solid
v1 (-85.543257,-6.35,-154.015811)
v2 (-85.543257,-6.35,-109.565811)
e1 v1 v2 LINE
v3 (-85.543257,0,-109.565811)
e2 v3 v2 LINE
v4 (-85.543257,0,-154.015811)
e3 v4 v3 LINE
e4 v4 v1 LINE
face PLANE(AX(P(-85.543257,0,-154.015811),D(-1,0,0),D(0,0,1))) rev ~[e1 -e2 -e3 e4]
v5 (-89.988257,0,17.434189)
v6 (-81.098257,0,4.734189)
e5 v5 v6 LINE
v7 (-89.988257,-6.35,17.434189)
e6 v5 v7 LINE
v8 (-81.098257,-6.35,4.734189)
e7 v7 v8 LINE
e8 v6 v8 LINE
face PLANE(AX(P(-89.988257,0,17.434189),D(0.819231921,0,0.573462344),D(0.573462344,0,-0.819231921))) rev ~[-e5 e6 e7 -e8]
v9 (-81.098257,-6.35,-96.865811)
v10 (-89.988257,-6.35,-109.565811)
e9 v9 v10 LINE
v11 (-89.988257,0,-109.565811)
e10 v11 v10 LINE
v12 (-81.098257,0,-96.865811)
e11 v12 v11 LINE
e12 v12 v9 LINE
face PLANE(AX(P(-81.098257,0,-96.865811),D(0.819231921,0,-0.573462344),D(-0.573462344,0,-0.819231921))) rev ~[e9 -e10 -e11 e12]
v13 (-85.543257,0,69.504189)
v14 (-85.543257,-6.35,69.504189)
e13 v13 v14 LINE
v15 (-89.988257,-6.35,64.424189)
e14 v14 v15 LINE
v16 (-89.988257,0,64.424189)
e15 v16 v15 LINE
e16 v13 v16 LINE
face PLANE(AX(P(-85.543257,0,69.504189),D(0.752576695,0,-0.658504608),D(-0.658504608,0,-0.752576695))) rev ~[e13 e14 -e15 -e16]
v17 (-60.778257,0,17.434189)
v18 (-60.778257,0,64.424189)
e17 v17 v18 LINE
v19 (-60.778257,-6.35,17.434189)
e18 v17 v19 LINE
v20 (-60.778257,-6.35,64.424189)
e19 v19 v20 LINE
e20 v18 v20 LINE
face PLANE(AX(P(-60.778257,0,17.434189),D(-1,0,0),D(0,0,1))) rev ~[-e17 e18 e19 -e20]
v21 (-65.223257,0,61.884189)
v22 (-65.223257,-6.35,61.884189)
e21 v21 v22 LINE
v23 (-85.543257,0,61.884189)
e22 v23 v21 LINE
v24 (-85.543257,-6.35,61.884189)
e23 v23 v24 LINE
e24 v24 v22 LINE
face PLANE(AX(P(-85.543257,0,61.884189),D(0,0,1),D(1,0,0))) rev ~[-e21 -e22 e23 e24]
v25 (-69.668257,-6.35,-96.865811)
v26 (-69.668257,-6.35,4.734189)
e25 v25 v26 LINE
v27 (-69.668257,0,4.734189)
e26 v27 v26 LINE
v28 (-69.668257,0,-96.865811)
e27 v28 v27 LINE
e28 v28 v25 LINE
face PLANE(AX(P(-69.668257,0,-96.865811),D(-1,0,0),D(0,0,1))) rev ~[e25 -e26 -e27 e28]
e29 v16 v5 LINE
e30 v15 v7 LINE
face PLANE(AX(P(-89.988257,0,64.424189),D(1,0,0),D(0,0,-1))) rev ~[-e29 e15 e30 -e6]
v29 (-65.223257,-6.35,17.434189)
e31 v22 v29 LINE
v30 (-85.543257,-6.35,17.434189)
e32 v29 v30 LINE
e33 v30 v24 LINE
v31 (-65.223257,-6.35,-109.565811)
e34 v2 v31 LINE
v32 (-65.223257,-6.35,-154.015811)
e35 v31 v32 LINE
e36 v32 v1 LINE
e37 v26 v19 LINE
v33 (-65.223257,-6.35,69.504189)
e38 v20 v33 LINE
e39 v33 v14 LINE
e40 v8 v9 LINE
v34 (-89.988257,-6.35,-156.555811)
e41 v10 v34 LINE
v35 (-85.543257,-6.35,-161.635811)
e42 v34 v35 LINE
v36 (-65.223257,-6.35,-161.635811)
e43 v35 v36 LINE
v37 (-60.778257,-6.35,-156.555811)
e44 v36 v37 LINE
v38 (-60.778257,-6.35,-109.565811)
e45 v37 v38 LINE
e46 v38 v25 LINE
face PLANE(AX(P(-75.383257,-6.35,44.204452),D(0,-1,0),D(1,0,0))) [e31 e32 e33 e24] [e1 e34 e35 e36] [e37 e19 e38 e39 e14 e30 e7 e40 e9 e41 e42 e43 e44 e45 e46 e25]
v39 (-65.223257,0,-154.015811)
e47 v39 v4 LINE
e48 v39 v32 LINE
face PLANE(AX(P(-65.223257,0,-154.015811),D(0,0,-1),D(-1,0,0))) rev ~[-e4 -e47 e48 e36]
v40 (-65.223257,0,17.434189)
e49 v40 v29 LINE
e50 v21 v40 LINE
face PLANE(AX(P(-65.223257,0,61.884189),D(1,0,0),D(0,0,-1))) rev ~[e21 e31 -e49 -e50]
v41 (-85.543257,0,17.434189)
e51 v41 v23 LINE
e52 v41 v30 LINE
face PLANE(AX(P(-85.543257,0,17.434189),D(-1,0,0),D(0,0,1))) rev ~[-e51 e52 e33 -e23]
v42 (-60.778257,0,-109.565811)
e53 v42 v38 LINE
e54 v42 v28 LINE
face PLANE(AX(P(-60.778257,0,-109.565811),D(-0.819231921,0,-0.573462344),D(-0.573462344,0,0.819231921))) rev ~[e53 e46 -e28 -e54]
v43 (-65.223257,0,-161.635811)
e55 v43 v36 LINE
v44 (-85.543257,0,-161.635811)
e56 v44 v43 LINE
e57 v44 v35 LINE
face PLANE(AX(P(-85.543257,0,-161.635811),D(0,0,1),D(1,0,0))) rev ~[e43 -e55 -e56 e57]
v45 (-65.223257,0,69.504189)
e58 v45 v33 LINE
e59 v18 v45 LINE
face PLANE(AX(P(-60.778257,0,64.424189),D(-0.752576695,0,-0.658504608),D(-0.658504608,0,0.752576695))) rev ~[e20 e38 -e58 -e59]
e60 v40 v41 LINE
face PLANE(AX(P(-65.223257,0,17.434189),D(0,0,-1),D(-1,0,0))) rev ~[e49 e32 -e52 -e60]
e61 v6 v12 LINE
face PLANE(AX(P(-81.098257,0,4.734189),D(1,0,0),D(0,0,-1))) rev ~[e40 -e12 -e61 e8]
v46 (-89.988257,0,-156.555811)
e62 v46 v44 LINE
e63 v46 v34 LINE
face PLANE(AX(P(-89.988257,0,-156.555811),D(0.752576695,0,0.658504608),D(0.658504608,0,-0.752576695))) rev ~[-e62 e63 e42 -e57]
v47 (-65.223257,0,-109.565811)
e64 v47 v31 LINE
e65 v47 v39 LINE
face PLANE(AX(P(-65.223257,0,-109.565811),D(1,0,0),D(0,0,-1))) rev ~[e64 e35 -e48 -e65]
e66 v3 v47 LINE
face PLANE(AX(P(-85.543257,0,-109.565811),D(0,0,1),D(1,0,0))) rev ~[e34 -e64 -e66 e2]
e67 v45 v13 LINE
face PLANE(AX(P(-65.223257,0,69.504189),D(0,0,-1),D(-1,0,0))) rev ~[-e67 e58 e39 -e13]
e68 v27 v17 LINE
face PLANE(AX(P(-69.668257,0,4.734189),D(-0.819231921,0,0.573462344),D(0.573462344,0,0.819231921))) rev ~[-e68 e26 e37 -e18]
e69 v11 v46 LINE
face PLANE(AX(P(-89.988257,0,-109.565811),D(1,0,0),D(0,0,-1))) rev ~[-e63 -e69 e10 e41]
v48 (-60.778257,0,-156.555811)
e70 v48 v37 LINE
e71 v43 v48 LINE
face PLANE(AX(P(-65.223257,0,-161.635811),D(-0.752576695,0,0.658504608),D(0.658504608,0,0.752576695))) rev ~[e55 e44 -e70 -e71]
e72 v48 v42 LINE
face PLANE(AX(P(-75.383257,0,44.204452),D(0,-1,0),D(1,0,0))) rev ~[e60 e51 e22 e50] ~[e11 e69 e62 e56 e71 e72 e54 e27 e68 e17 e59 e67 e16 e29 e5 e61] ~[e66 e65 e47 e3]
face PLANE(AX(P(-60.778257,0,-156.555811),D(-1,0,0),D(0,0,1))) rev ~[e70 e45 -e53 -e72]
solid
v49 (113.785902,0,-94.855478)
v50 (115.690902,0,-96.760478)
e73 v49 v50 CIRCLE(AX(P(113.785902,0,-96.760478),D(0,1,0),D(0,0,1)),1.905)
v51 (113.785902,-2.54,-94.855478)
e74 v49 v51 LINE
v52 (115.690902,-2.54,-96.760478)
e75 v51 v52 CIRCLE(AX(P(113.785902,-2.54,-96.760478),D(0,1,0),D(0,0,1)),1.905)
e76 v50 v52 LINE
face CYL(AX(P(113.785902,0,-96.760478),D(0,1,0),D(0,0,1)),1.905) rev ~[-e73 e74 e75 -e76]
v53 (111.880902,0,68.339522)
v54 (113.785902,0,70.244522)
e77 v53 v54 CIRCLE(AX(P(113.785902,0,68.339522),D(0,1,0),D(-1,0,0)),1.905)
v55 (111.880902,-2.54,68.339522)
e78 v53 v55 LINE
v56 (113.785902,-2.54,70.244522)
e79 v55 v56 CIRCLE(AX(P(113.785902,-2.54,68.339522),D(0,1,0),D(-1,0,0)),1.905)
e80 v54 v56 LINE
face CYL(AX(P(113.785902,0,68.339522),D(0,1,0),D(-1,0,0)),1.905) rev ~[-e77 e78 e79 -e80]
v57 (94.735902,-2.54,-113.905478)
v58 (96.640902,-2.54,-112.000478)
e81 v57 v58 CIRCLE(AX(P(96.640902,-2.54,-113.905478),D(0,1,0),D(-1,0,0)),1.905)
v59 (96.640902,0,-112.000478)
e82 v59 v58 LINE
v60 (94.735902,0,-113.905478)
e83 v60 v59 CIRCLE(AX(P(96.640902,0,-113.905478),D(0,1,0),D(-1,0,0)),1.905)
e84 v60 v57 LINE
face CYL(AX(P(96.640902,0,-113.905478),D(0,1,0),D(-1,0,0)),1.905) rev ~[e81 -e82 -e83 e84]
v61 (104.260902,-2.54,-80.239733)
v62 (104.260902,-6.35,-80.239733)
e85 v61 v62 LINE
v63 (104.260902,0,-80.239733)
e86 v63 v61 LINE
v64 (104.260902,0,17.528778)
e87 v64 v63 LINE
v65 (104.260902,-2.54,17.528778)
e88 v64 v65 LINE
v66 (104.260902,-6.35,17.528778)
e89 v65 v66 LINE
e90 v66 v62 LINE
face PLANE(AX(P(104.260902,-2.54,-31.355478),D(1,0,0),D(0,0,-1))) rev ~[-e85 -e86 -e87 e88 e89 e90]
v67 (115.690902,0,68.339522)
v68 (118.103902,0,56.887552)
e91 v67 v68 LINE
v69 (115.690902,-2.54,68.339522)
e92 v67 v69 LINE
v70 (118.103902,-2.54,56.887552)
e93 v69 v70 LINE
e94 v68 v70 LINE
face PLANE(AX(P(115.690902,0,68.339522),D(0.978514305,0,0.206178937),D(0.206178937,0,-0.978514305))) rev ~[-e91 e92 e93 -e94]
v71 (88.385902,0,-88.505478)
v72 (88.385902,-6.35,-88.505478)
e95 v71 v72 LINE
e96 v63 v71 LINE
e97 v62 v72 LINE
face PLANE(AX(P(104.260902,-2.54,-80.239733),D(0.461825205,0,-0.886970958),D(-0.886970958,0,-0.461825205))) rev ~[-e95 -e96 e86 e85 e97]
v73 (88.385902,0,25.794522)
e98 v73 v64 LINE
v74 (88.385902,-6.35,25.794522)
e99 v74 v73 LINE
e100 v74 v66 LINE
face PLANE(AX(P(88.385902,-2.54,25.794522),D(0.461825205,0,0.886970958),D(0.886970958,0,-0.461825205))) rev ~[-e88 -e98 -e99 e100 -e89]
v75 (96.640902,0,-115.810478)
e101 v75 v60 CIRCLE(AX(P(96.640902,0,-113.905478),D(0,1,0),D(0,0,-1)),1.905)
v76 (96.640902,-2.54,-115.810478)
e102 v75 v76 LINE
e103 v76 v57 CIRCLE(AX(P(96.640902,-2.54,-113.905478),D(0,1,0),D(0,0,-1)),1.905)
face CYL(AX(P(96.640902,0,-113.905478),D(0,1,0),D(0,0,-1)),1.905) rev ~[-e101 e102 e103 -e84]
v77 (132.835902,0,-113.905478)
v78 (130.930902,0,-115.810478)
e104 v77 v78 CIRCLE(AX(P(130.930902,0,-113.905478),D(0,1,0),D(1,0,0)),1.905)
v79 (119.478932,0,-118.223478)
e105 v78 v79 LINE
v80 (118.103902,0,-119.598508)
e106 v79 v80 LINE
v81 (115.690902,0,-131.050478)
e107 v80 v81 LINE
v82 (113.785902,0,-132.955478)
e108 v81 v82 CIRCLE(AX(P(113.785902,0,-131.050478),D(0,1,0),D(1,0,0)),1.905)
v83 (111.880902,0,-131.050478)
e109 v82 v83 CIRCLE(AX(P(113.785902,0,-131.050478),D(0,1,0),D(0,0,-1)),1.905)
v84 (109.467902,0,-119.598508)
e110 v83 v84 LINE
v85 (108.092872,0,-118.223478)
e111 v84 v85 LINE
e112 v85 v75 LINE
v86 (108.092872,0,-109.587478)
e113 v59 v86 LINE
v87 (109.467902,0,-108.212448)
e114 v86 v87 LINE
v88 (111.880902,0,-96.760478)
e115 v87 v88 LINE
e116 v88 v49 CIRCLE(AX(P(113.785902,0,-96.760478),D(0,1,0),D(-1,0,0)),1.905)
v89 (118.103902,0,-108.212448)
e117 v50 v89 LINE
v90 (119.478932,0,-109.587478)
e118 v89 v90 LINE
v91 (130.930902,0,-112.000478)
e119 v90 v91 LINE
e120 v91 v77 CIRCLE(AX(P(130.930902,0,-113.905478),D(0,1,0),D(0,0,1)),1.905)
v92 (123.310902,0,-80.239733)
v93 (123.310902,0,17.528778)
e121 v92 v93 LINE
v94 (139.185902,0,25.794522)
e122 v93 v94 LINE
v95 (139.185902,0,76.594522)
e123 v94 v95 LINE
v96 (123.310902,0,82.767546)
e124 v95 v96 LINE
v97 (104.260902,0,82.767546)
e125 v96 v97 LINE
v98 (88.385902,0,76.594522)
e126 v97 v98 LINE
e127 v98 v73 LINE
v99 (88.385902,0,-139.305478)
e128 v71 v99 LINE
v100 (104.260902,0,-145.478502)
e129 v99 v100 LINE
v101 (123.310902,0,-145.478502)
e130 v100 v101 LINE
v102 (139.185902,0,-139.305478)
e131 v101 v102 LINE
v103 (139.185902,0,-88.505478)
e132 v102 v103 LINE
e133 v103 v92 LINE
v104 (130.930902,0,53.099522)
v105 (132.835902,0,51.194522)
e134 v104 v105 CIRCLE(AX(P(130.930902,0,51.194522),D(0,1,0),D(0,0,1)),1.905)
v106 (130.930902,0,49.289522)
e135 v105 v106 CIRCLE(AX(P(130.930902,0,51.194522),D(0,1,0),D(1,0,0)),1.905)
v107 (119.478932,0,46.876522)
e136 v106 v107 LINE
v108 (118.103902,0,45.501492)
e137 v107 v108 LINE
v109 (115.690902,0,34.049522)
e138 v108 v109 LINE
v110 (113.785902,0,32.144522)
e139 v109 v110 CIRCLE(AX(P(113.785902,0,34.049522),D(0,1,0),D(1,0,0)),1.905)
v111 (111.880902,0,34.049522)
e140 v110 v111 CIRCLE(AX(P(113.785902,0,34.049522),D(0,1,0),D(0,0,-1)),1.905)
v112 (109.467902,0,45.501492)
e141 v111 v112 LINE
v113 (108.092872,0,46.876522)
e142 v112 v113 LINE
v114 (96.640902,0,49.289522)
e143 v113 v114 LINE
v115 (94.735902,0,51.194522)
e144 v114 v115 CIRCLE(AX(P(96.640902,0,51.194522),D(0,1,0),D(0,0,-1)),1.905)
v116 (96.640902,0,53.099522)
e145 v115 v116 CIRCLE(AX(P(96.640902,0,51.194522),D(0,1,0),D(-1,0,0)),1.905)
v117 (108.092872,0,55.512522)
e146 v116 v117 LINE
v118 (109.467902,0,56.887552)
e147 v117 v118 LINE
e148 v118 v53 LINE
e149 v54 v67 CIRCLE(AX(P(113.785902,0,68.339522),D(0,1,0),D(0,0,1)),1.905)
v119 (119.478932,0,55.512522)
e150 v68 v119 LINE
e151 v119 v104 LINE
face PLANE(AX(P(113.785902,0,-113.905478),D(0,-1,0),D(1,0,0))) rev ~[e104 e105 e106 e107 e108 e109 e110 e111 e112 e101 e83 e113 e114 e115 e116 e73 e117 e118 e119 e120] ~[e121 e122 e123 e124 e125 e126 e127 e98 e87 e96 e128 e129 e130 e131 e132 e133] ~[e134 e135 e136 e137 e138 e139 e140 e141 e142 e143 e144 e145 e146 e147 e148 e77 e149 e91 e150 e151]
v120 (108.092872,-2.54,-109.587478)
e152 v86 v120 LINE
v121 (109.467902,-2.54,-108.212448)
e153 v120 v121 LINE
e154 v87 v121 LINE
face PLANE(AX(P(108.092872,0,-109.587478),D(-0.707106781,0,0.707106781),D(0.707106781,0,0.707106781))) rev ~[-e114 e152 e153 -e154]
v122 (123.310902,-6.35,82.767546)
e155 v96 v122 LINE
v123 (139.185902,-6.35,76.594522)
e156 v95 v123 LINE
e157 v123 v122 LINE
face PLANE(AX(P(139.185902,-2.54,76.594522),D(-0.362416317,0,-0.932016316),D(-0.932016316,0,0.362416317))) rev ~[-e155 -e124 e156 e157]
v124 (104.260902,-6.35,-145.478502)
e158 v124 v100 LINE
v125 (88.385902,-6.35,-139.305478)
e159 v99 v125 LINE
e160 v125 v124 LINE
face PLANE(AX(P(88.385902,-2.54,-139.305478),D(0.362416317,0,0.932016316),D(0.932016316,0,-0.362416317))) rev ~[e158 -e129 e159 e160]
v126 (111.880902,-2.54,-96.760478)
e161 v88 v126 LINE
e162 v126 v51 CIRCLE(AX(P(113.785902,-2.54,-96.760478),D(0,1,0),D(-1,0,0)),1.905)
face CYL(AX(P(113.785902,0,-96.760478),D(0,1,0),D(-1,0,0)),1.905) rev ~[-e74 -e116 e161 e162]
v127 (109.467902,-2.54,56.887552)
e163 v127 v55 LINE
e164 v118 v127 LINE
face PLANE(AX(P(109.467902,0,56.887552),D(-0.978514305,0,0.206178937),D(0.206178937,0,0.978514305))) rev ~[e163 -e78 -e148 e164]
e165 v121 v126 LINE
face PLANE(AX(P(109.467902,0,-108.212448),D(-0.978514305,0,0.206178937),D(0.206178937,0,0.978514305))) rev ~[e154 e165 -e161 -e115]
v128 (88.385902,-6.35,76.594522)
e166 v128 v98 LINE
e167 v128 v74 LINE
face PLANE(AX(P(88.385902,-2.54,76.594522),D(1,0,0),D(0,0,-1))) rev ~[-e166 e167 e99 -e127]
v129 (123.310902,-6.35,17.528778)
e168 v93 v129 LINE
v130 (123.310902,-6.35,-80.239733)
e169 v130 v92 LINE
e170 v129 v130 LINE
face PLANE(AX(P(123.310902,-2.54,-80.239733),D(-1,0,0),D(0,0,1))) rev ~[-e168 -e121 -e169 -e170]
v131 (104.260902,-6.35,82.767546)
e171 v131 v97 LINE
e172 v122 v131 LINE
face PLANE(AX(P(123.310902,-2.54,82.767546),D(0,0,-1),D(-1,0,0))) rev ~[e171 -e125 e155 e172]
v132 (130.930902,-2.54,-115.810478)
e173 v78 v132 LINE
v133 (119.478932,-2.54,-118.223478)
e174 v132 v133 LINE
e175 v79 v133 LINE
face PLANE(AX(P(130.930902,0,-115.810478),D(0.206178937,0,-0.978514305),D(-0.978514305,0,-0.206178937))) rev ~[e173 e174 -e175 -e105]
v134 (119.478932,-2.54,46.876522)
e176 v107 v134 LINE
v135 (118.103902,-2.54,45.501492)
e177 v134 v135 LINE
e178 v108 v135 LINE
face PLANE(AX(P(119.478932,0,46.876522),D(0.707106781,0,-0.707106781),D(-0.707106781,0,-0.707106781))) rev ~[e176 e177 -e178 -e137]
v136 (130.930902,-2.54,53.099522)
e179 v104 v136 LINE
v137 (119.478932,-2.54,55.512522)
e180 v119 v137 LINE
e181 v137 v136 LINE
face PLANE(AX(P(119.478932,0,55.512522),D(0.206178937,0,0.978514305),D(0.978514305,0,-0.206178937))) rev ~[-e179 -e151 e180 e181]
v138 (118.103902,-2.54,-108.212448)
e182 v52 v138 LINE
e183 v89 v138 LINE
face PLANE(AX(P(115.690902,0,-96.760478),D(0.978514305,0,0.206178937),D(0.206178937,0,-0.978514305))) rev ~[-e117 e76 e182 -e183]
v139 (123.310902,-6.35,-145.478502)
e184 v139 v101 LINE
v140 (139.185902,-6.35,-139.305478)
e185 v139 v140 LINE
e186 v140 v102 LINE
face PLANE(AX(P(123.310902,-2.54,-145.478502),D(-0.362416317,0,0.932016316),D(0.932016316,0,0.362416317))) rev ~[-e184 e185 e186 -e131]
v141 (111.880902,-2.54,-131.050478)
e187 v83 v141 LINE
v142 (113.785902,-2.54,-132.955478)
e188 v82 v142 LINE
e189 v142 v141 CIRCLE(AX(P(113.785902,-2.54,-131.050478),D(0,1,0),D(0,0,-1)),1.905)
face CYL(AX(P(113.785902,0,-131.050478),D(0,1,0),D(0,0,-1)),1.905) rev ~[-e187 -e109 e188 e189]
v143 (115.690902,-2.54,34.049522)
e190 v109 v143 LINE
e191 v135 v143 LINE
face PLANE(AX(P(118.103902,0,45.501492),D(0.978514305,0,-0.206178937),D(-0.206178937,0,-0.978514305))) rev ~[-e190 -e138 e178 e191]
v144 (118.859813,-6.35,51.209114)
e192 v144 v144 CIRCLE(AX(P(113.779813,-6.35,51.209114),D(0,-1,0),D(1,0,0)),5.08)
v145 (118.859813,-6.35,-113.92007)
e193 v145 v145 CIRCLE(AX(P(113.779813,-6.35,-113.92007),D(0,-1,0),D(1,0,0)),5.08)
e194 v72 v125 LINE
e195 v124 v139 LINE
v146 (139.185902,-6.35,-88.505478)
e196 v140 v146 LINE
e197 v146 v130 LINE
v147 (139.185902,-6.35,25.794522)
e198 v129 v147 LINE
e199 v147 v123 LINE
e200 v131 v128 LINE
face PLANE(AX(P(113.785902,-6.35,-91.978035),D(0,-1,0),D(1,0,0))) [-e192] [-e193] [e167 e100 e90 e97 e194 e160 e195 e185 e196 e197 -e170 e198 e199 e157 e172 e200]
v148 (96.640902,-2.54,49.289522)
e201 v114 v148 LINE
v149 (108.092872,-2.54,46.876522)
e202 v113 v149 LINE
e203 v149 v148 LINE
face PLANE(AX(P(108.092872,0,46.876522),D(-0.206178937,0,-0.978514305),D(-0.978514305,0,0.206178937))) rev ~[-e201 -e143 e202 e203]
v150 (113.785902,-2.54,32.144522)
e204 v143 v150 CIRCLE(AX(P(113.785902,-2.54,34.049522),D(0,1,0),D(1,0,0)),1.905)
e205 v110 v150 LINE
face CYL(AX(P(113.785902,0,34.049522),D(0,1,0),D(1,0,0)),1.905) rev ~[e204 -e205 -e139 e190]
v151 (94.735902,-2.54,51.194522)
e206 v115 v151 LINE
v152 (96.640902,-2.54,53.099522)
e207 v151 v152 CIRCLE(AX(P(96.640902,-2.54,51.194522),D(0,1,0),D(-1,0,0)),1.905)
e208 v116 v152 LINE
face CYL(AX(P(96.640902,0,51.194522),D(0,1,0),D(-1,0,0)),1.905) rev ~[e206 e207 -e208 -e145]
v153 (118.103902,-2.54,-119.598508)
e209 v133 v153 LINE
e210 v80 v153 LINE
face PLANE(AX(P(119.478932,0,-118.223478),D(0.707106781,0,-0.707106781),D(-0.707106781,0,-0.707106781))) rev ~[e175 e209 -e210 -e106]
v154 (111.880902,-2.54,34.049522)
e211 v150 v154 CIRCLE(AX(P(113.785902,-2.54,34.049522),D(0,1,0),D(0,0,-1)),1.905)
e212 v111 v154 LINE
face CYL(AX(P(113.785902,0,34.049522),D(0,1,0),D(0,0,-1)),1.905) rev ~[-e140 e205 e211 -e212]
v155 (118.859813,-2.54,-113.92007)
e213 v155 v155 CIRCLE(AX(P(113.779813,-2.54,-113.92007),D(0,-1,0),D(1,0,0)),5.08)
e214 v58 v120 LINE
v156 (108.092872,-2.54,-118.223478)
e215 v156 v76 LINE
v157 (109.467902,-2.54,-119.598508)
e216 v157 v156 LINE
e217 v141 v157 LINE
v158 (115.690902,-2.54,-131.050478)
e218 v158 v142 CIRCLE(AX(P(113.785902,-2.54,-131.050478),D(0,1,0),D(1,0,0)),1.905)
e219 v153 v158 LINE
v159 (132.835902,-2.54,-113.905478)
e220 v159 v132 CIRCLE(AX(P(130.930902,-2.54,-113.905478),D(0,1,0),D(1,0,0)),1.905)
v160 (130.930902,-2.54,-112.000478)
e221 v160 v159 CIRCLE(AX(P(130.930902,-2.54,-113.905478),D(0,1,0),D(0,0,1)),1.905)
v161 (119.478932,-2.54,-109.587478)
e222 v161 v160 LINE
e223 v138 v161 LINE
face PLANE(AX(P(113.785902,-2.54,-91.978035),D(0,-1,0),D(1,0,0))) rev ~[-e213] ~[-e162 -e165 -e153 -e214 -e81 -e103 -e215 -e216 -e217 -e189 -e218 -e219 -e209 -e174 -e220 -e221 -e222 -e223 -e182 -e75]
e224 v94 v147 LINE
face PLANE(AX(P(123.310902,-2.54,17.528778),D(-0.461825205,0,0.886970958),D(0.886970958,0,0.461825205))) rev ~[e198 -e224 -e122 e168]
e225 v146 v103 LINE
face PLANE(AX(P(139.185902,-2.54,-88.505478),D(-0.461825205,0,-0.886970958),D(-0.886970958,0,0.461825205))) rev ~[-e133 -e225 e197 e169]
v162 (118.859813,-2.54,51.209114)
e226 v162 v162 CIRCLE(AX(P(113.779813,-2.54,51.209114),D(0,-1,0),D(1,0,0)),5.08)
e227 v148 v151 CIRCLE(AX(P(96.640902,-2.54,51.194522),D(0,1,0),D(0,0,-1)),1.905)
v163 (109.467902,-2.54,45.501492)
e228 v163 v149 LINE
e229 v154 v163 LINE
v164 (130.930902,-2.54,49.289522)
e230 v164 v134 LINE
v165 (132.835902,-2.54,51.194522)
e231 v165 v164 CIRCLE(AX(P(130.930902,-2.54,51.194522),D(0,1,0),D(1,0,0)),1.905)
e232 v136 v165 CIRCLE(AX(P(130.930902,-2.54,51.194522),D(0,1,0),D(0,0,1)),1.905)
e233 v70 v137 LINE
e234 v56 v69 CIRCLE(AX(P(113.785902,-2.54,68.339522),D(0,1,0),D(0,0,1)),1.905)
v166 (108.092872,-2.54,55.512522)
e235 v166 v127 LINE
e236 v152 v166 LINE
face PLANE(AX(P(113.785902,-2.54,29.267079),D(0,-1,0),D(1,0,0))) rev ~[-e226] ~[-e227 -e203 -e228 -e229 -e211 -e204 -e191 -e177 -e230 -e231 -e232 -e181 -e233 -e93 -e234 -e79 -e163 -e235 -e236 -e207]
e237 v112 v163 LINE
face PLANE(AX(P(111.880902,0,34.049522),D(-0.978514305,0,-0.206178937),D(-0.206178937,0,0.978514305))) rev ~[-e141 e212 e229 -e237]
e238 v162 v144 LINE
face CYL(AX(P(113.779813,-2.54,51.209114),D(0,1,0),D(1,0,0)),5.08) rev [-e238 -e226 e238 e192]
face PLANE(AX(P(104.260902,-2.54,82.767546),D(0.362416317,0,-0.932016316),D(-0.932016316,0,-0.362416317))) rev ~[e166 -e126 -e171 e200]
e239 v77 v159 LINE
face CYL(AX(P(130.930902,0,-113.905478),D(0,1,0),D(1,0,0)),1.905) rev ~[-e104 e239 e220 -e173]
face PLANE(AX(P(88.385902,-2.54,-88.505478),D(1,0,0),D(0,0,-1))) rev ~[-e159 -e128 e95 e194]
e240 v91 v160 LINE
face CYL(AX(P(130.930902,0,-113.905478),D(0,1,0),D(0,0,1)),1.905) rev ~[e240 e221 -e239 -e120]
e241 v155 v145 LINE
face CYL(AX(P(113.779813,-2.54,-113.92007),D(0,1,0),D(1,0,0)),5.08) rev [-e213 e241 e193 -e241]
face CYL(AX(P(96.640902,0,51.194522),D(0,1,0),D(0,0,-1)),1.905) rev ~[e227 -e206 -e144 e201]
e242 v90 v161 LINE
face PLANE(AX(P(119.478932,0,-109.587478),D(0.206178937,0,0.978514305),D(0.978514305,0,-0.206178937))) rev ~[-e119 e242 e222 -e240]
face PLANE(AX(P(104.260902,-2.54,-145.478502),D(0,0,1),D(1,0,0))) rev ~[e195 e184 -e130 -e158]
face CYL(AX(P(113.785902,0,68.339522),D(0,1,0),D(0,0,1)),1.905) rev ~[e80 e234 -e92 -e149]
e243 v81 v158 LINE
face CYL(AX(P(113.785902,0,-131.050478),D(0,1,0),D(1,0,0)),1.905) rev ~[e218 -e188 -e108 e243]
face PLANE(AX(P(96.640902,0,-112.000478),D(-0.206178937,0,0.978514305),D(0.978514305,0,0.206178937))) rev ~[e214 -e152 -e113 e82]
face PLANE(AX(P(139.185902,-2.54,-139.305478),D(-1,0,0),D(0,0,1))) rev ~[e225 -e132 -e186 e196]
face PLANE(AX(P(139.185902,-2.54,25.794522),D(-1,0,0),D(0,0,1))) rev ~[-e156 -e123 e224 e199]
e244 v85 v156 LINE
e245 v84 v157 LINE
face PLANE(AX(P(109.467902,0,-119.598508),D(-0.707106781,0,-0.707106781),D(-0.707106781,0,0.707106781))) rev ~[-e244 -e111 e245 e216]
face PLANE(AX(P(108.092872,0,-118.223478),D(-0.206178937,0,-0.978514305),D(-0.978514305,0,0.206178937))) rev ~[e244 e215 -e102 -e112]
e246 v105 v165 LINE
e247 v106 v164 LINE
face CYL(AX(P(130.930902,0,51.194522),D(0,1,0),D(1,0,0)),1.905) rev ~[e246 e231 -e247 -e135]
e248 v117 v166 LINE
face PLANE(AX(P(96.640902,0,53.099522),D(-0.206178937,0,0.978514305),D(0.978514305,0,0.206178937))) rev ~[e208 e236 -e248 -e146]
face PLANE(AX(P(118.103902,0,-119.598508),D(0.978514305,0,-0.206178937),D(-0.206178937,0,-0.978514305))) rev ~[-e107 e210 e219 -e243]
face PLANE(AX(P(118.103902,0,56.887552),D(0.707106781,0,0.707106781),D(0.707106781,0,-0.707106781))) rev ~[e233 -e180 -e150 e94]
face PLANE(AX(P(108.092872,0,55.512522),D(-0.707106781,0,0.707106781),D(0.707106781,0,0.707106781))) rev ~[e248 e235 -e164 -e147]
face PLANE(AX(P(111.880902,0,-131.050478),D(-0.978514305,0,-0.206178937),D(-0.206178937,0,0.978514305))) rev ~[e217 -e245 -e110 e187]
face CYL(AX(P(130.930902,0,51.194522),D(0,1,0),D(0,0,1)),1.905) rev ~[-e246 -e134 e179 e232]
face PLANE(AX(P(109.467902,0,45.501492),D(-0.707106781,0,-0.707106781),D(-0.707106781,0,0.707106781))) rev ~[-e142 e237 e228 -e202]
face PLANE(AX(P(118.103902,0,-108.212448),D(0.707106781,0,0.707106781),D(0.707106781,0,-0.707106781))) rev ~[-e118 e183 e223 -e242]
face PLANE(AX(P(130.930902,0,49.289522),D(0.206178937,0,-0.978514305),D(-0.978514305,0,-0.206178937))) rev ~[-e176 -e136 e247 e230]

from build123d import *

# Parameters (mm, degrees)
F1_DEPTH = 6.35
F2_W     = 19.05
F2_H     = 8.2657442963
F2_H_2   = 48.8842557037
F3_DEPTH = 2.54
F4_R     = 5.08
F5_DEPTH = 3.81
F8_DEPTH = 3.81


# Not quite as in the source:
# - a feature names something its author has since deleted; it is built from what else it names


with BuildPart() as f1:
    # F0 (on Front) → F1 (new body)
    with BuildSketch(Plane.XZ):
        Polygon((-89.9882571208, 17.4341889973), (-85.5432571208, 17.4341889973), (-85.5432571208, 61.8841889973), (-65.2232571208, 61.8841889973), (-65.2232571208, 17.4341889973), (-60.7782571208, 17.4341889973), (-60.7782571208, 64.4241889973), (-89.9882571208, 64.4241889973), align=None)
        Polygon((-81.0982571208, 4.7341889973), (-81.0982571208, 17.4341889973), (-85.5432571208, 17.4341889973), (-89.9882571208, 17.4341889973), align=None)
        Polygon((-69.6682571208, 17.4341889973), (-81.0982571208, 17.4341889973), (-81.0982571208, 4.7341889973), (-81.0982571208, -46.0658110027), (-69.6682571208, -46.0658110027), (-69.6682571208, 4.7341889973), align=None)
        Polygon((-65.2232571208, 17.4341889973), (-69.6682571208, 17.4341889973), (-69.6682571208, 4.7341889973), (-60.7782571208, 17.4341889973), align=None)
        Polygon((-69.6682571208, -46.0658110027), (-81.0982571208, -46.0658110027), (-81.0982571208, -96.8658110027), (-81.0982571208, -109.5658110027), (-69.6682571208, -109.5658110027), (-69.6682571208, -96.8658110027), align=None)
        Polygon((-81.0982571208, -109.5658110027), (-81.0982571208, -96.8658110027), (-89.9882571208, -109.5658110027), (-85.5432571208, -109.5658110027), align=None)
        Polygon((-60.7782571208, -109.5658110027), (-69.6682571208, -96.8658110027), (-69.6682571208, -109.5658110027), (-65.2232571208, -109.5658110027), align=None)
        Polygon((-85.5432571208, -109.5658110027), (-89.9882571208, -109.5658110027), (-89.9882571208, -156.5558110027), (-60.7782571208, -156.5558110027), (-60.7782571208, -109.5658110027), (-65.2232571208, -109.5658110027), (-65.2232571208, -154.0158110027), (-85.5432571208, -154.0158110027), align=None)
        Polygon((-85.5432571208, 69.5041889973), (-89.9882571208, 64.4241889973), (-60.7782571208, 64.4241889973), (-65.2232571208, 69.5041889973), align=None)
        Polygon((-60.7782571208, -156.5558110027), (-89.9882571208, -156.5558110027), (-85.5432571208, -161.6358110027), (-65.2232571208, -161.6358110027), align=None)
    extrude(amount=F1_DEPTH)


with BuildPart() as f3:
    # F2 (on Front) → F3 (new body)
    with BuildSketch(Plane.XZ):
        Polygon((104.2609019141, -88.5054777617), (88.3859019141, -88.5054777617), (88.3859019141, -139.3054777617), (139.1859019141, -139.3054777617), (139.1859019141, -88.5054777617), (123.3109019141, -88.5054777617), align=None)
        with BuildLine():
            ThreePointArc((113.7859019141, -132.9554777617), (112.438863496, -132.3975161798), (111.8809019141, -131.0504777617))
            Line((111.8809019141, -131.0504777617), (109.4679019141, -119.5985076655))
            Line((109.4679019141, -119.5985076655), (108.0928720103, -118.2234777617))
            Line((108.0928720103, -118.2234777617), (96.6409019141, -115.8104777617))
            ThreePointArc((96.6409019141, -115.8104777617), (95.293863496, -115.2525161798), (94.7359019141, -113.9054777617))
            ThreePointArc((94.7359019141, -113.9054777617), (95.293863496, -112.5584393435), (96.6409019141, -112.0004777617))
            Line((96.6409019141, -112.0004777617), (108.0928720103, -109.5874777617))
            Line((108.0928720103, -109.5874777617), (109.4679019141, -108.2124478579))
            Line((109.4679019141, -108.2124478579), (111.8809019141, -96.7604777617))
            ThreePointArc((111.8809019141, -96.7604777617), (112.438863496, -95.4134393435), (113.7859019141, -94.8554777617))
            ThreePointArc((113.7859019141, -94.8554777617), (115.1329403323, -95.4134393435), (115.6909019141, -96.7604777617))
            Line((115.6909019141, -96.7604777617), (118.1039019141, -108.2124478579))
            Line((118.1039019141, -108.2124478579), (119.4789318179, -109.5874777617))
            Line((119.4789318179, -109.5874777617), (130.9309019141, -112.0004777617))
            ThreePointArc((130.9309019141, -112.0004777617), (132.2779403323, -112.5584393435), (132.8359019141, -113.9054777617))
            ThreePointArc((132.8359019141, -113.9054777617), (132.2779403323, -115.2525161798), (130.9309019141, -115.8104777617))
            Line((130.9309019141, -115.8104777617), (119.4789318179, -118.2234777617))
            Line((119.4789318179, -118.2234777617), (118.1039019141, -119.5985076655))
            Line((118.1039019141, -119.5985076655), (115.6909019141, -131.0504777617))
            ThreePointArc((115.6909019141, -131.0504777617), (115.1329403323, -132.3975161798), (113.7859019141, -132.9554777617))
        make_face(mode=Mode.SUBTRACT)
        Polygon((139.1859019141, -139.3054777617), (88.3859019141, -139.3054777617), (104.2609019141, -145.4785017002), (123.3109019141, -145.4785017002), align=None)
        Polygon((104.2609019141, -88.5054777617), (104.2609019141, -80.2397334654), (88.3859019141, -88.5054777617), align=None)
        with Locations((113.7859019141, -84.3726056135)):
            Rectangle(F2_W, F2_H)
        Polygon((139.1859019141, -88.5054777617), (123.3109019141, -80.2397334654), (123.3109019141, -88.5054777617), align=None)
        with Locations((113.7859019141, -55.7976056135)):
            Rectangle(F2_W, F2_H_2)
        with Locations((113.7859019141, -6.9133499098)):
            Rectangle(F2_W, F2_H_2)
        Polygon((139.1859019141, 76.5945222383), (88.3859019141, 76.5945222383), (88.3859019141, 25.7945222383), (104.2609019141, 25.7945222383), (123.3109019141, 25.7945222383), (139.1859019141, 25.7945222383), align=None)
        with BuildLine():
            Line((109.4679019141, 56.8875521421), (111.8809019141, 68.3395222383))
            ThreePointArc((111.8809019141, 68.3395222383), (112.438863496, 69.6865606565), (113.7859019141, 70.2445222383))
            ThreePointArc((113.7859019141, 70.2445222383), (115.1329403323, 69.6865606565), (115.6909019141, 68.3395222383))
            Line((115.6909019141, 68.3395222383), (118.1039019141, 56.8875521421))
            Line((118.1039019141, 56.8875521421), (119.4789318179, 55.5125222383))
            Line((119.4789318179, 55.5125222383), (130.9309019141, 53.0995222383))
            ThreePointArc((130.9309019141, 53.0995222383), (132.2779403323, 52.5415606565), (132.8359019141, 51.1945222383))
            ThreePointArc((132.8359019141, 51.1945222383), (132.2779403323, 49.8474838202), (130.9309019141, 49.2895222383))
            Line((130.9309019141, 49.2895222383), (119.4789318179, 46.8765222383))
            Line((119.4789318179, 46.8765222383), (118.1039019141, 45.5014923345))
            Line((118.1039019141, 45.5014923345), (115.6909019141, 34.0495222383))
            ThreePointArc((115.6909019141, 34.0495222383), (115.1329403323, 32.7024838202), (113.7859019141, 32.1445222383))
            ThreePointArc((113.7859019141, 32.1445222383), (112.438863496, 32.7024838202), (111.8809019141, 34.0495222383))
            Line((111.8809019141, 34.0495222383), (109.4679019141, 45.5014923345))
            Line((109.4679019141, 45.5014923345), (108.0928720103, 46.8765222383))
            Line((108.0928720103, 46.8765222383), (96.6409019141, 49.2895222383))
            ThreePointArc((96.6409019141, 49.2895222383), (95.293863496, 49.8474838202), (94.7359019141, 51.1945222383))
            ThreePointArc((94.7359019141, 51.1945222383), (95.293863496, 52.5415606565), (96.6409019141, 53.0995222383))
            Line((96.6409019141, 53.0995222383), (108.0928720103, 55.5125222383))
            Line((108.0928720103, 55.5125222383), (109.4679019141, 56.8875521421))
        make_face(mode=Mode.SUBTRACT)
        Polygon((104.2609019141, 25.7945222383), (88.3859019141, 25.7945222383), (104.2609019141, 17.5287779421), align=None)
        with Locations((113.7859019141, 21.6616500902)):
            Rectangle(F2_W, F2_H)
        Polygon((123.3109019141, 17.5287779421), (139.1859019141, 25.7945222383), (123.3109019141, 25.7945222383), align=None)
        Polygon((104.2609019141, 82.7675461769), (88.3859019141, 76.5945222383), (139.1859019141, 76.5945222383), (123.3109019141, 82.7675461769), align=None)
    extrude(amount=F3_DEPTH)

    # F4 (on face) → F5 (join)
    with BuildSketch(Plane.XZ.offset(2.54)):
        Polygon((104.2609019141, -31.3554777617), (123.3109019141, -31.3554777617), (123.3109019141, 17.5287779421), (139.1859019141, 25.7945222383), (139.1859019141, 76.5945222383), (123.3109019141, 82.7675461769), (104.2609019141, 82.7675461769), (88.3859019141, 76.5945222383), (88.3859019141, 25.7945222383), (104.2609019141, 17.5287779421), align=None)
        with BuildLine():
            Line((108.0928720103, 55.5125222383), (109.4679019141, 56.8875521421))
            Line((109.4679019141, 56.8875521421), (111.8809019141, 68.3395222383))
            ThreePointArc((111.8809019141, 68.3395222383), (113.7859019141, 70.2445222383), (115.6909019141, 68.3395222383))
            Line((115.6909019141, 68.3395222383), (118.1039019141, 56.8875521421))
            Line((118.1039019141, 56.8875521421), (119.4789318179, 55.5125222383))
            Line((119.4789318179, 55.5125222383), (130.9309019141, 53.0995222383))
            ThreePointArc((130.9309019141, 53.0995222383), (132.8359019141, 51.1945222383), (130.9309019141, 49.2895222383))
            Line((130.9309019141, 49.2895222383), (119.4789318179, 46.8765222383))
            Line((119.4789318179, 46.8765222383), (118.1039019141, 45.5014923345))
            Line((118.1039019141, 45.5014923345), (115.6909019141, 34.0495222383))
            ThreePointArc((115.6909019141, 34.0495222383), (113.7859019141, 32.1445222383), (111.8809019141, 34.0495222383))
            Line((111.8809019141, 34.0495222383), (109.4679019141, 45.5014923345))
            Line((109.4679019141, 45.5014923345), (108.0928720103, 46.8765222383))
            Line((108.0928720103, 46.8765222383), (96.6409019141, 49.2895222383))
            ThreePointArc((96.6409019141, 49.2895222383), (94.7359019141, 51.1945222383), (96.6409019141, 53.0995222383))
            Line((96.6409019141, 53.0995222383), (108.0928720103, 55.5125222383))
        make_face(mode=Mode.SUBTRACT)
        with BuildLine():
            Line((111.8809019141, 68.3395222383), (109.4679019141, 56.8875521421))
            Line((109.4679019141, 56.8875521421), (108.0928720103, 55.5125222383))
            Line((108.0928720103, 55.5125222383), (96.6409019141, 53.0995222383))
            ThreePointArc((96.6409019141, 53.0995222383), (94.7359019141, 51.1945222383), (96.6409019141, 49.2895222383))
            Line((96.6409019141, 49.2895222383), (108.0928720103, 46.8765222383))
            Line((108.0928720103, 46.8765222383), (109.4679019141, 45.5014923345))
            Line((109.4679019141, 45.5014923345), (111.8809019141, 34.0495222383))
            ThreePointArc((111.8809019141, 34.0495222383), (113.7859019141, 32.1445222383), (115.6909019141, 34.0495222383))
            Line((115.6909019141, 34.0495222383), (118.1039019141, 45.5014923345))
            Line((118.1039019141, 45.5014923345), (119.4789318179, 46.8765222383))
            Line((119.4789318179, 46.8765222383), (130.9309019141, 49.2895222383))
            ThreePointArc((130.9309019141, 49.2895222383), (132.8359019141, 51.1945222383), (130.9309019141, 53.0995222383))
            Line((130.9309019141, 53.0995222383), (119.4789318179, 55.5125222383))
            Line((119.4789318179, 55.5125222383), (118.1039019141, 56.8875521421))
            Line((118.1039019141, 56.8875521421), (115.6909019141, 68.3395222383))
            ThreePointArc((115.6909019141, 68.3395222383), (113.7859019141, 70.2445222383), (111.8809019141, 68.3395222383))
        make_face()
        with Locations((113.7798130512, 51.2091144919)):
            Circle(F4_R, mode=Mode.SUBTRACT)
    extrude(amount=F5_DEPTH)

    # F4 (on face) → F8 (join)
    with BuildSketch(Plane.XZ.offset(2.54)):
        Polygon((123.3109019141, -80.2397334654), (123.3109019141, -31.3554777617), (104.2609019141, -31.3554777617), (104.2609019141, -80.2397334654), (88.3859019141, -88.5054777617), (88.3859019141, -139.3054777617), (104.2609019141, -145.4785017002), (123.3109019141, -145.4785017002), (139.1859019141, -139.3054777617), (139.1859019141, -88.5054777617), align=None)
        with BuildLine():
            ThreePointArc((130.9309019141, -112.0004777617), (132.8359019141, -113.9054777617), (130.9309019141, -115.8104777617))
            Line((130.9309019141, -115.8104777617), (119.4789318179, -118.2234777617))
            Line((119.4789318179, -118.2234777617), (118.1039019141, -119.5985076655))
            Line((118.1039019141, -119.5985076655), (115.6909019141, -131.0504777617))
            ThreePointArc((115.6909019141, -131.0504777617), (113.7859019141, -132.9554777617), (111.8809019141, -131.0504777617))
            Line((111.8809019141, -131.0504777617), (109.4679019141, -119.5985076655))
            Line((109.4679019141, -119.5985076655), (108.0928720103, -118.2234777617))
            Line((108.0928720103, -118.2234777617), (96.6409019141, -115.8104777617))
            ThreePointArc((96.6409019141, -115.8104777617), (94.7359019141, -113.9054777617), (96.6409019141, -112.0004777617))
            Line((96.6409019141, -112.0004777617), (108.0928720103, -109.5874777617))
            Line((108.0928720103, -109.5874777617), (109.4679019141, -108.2124478579))
            Line((109.4679019141, -108.2124478579), (111.8809019141, -96.7604777617))
            ThreePointArc((111.8809019141, -96.7604777617), (113.7859019141, -94.8554777617), (115.6909019141, -96.7604777617))
            Line((115.6909019141, -96.7604777617), (118.1039019141, -108.2124478579))
            Line((118.1039019141, -108.2124478579), (119.4789318179, -109.5874777617))
            Line((119.4789318179, -109.5874777617), (130.9309019141, -112.0004777617))
        make_face(mode=Mode.SUBTRACT)
        with BuildLine():
            Line((119.4789318179, -118.2234777617), (130.9309019141, -115.8104777617))
            ThreePointArc((130.9309019141, -115.8104777617), (132.8359019141, -113.9054777617), (130.9309019141, -112.0004777617))
            Line((130.9309019141, -112.0004777617), (119.4789318179, -109.5874777617))
            Line((119.4789318179, -109.5874777617), (118.1039019141, -108.2124478579))
            Line((118.1039019141, -108.2124478579), (115.6909019141, -96.7604777617))
            ThreePointArc((115.6909019141, -96.7604777617), (113.7859019141, -94.8554777617), (111.8809019141, -96.7604777617))
            Line((111.8809019141, -96.7604777617), (109.4679019141, -108.2124478579))
            Line((109.4679019141, -108.2124478579), (108.0928720103, -109.5874777617))
            Line((108.0928720103, -109.5874777617), (96.6409019141, -112.0004777617))
            ThreePointArc((96.6409019141, -112.0004777617), (94.7359019141, -113.9054777617), (96.6409019141, -115.8104777617))
            Line((96.6409019141, -115.8104777617), (108.0928720103, -118.2234777617))
            Line((108.0928720103, -118.2234777617), (109.4679019141, -119.5985076655))
            Line((109.4679019141, -119.5985076655), (111.8809019141, -131.0504777617))
            ThreePointArc((111.8809019141, -131.0504777617), (113.7859019141, -132.9554777617), (115.6909019141, -131.0504777617))
            Line((115.6909019141, -131.0504777617), (118.1039019141, -119.5985076655))
            Line((118.1039019141, -119.5985076655), (119.4789318179, -118.2234777617))
        make_face()
        with Locations((113.7798130512, -113.9200700153)):
            Circle(F4_R, mode=Mode.SUBTRACT)
    extrude(amount=F8_DEPTH)


solid = Compound([f1.part, f3.part])
